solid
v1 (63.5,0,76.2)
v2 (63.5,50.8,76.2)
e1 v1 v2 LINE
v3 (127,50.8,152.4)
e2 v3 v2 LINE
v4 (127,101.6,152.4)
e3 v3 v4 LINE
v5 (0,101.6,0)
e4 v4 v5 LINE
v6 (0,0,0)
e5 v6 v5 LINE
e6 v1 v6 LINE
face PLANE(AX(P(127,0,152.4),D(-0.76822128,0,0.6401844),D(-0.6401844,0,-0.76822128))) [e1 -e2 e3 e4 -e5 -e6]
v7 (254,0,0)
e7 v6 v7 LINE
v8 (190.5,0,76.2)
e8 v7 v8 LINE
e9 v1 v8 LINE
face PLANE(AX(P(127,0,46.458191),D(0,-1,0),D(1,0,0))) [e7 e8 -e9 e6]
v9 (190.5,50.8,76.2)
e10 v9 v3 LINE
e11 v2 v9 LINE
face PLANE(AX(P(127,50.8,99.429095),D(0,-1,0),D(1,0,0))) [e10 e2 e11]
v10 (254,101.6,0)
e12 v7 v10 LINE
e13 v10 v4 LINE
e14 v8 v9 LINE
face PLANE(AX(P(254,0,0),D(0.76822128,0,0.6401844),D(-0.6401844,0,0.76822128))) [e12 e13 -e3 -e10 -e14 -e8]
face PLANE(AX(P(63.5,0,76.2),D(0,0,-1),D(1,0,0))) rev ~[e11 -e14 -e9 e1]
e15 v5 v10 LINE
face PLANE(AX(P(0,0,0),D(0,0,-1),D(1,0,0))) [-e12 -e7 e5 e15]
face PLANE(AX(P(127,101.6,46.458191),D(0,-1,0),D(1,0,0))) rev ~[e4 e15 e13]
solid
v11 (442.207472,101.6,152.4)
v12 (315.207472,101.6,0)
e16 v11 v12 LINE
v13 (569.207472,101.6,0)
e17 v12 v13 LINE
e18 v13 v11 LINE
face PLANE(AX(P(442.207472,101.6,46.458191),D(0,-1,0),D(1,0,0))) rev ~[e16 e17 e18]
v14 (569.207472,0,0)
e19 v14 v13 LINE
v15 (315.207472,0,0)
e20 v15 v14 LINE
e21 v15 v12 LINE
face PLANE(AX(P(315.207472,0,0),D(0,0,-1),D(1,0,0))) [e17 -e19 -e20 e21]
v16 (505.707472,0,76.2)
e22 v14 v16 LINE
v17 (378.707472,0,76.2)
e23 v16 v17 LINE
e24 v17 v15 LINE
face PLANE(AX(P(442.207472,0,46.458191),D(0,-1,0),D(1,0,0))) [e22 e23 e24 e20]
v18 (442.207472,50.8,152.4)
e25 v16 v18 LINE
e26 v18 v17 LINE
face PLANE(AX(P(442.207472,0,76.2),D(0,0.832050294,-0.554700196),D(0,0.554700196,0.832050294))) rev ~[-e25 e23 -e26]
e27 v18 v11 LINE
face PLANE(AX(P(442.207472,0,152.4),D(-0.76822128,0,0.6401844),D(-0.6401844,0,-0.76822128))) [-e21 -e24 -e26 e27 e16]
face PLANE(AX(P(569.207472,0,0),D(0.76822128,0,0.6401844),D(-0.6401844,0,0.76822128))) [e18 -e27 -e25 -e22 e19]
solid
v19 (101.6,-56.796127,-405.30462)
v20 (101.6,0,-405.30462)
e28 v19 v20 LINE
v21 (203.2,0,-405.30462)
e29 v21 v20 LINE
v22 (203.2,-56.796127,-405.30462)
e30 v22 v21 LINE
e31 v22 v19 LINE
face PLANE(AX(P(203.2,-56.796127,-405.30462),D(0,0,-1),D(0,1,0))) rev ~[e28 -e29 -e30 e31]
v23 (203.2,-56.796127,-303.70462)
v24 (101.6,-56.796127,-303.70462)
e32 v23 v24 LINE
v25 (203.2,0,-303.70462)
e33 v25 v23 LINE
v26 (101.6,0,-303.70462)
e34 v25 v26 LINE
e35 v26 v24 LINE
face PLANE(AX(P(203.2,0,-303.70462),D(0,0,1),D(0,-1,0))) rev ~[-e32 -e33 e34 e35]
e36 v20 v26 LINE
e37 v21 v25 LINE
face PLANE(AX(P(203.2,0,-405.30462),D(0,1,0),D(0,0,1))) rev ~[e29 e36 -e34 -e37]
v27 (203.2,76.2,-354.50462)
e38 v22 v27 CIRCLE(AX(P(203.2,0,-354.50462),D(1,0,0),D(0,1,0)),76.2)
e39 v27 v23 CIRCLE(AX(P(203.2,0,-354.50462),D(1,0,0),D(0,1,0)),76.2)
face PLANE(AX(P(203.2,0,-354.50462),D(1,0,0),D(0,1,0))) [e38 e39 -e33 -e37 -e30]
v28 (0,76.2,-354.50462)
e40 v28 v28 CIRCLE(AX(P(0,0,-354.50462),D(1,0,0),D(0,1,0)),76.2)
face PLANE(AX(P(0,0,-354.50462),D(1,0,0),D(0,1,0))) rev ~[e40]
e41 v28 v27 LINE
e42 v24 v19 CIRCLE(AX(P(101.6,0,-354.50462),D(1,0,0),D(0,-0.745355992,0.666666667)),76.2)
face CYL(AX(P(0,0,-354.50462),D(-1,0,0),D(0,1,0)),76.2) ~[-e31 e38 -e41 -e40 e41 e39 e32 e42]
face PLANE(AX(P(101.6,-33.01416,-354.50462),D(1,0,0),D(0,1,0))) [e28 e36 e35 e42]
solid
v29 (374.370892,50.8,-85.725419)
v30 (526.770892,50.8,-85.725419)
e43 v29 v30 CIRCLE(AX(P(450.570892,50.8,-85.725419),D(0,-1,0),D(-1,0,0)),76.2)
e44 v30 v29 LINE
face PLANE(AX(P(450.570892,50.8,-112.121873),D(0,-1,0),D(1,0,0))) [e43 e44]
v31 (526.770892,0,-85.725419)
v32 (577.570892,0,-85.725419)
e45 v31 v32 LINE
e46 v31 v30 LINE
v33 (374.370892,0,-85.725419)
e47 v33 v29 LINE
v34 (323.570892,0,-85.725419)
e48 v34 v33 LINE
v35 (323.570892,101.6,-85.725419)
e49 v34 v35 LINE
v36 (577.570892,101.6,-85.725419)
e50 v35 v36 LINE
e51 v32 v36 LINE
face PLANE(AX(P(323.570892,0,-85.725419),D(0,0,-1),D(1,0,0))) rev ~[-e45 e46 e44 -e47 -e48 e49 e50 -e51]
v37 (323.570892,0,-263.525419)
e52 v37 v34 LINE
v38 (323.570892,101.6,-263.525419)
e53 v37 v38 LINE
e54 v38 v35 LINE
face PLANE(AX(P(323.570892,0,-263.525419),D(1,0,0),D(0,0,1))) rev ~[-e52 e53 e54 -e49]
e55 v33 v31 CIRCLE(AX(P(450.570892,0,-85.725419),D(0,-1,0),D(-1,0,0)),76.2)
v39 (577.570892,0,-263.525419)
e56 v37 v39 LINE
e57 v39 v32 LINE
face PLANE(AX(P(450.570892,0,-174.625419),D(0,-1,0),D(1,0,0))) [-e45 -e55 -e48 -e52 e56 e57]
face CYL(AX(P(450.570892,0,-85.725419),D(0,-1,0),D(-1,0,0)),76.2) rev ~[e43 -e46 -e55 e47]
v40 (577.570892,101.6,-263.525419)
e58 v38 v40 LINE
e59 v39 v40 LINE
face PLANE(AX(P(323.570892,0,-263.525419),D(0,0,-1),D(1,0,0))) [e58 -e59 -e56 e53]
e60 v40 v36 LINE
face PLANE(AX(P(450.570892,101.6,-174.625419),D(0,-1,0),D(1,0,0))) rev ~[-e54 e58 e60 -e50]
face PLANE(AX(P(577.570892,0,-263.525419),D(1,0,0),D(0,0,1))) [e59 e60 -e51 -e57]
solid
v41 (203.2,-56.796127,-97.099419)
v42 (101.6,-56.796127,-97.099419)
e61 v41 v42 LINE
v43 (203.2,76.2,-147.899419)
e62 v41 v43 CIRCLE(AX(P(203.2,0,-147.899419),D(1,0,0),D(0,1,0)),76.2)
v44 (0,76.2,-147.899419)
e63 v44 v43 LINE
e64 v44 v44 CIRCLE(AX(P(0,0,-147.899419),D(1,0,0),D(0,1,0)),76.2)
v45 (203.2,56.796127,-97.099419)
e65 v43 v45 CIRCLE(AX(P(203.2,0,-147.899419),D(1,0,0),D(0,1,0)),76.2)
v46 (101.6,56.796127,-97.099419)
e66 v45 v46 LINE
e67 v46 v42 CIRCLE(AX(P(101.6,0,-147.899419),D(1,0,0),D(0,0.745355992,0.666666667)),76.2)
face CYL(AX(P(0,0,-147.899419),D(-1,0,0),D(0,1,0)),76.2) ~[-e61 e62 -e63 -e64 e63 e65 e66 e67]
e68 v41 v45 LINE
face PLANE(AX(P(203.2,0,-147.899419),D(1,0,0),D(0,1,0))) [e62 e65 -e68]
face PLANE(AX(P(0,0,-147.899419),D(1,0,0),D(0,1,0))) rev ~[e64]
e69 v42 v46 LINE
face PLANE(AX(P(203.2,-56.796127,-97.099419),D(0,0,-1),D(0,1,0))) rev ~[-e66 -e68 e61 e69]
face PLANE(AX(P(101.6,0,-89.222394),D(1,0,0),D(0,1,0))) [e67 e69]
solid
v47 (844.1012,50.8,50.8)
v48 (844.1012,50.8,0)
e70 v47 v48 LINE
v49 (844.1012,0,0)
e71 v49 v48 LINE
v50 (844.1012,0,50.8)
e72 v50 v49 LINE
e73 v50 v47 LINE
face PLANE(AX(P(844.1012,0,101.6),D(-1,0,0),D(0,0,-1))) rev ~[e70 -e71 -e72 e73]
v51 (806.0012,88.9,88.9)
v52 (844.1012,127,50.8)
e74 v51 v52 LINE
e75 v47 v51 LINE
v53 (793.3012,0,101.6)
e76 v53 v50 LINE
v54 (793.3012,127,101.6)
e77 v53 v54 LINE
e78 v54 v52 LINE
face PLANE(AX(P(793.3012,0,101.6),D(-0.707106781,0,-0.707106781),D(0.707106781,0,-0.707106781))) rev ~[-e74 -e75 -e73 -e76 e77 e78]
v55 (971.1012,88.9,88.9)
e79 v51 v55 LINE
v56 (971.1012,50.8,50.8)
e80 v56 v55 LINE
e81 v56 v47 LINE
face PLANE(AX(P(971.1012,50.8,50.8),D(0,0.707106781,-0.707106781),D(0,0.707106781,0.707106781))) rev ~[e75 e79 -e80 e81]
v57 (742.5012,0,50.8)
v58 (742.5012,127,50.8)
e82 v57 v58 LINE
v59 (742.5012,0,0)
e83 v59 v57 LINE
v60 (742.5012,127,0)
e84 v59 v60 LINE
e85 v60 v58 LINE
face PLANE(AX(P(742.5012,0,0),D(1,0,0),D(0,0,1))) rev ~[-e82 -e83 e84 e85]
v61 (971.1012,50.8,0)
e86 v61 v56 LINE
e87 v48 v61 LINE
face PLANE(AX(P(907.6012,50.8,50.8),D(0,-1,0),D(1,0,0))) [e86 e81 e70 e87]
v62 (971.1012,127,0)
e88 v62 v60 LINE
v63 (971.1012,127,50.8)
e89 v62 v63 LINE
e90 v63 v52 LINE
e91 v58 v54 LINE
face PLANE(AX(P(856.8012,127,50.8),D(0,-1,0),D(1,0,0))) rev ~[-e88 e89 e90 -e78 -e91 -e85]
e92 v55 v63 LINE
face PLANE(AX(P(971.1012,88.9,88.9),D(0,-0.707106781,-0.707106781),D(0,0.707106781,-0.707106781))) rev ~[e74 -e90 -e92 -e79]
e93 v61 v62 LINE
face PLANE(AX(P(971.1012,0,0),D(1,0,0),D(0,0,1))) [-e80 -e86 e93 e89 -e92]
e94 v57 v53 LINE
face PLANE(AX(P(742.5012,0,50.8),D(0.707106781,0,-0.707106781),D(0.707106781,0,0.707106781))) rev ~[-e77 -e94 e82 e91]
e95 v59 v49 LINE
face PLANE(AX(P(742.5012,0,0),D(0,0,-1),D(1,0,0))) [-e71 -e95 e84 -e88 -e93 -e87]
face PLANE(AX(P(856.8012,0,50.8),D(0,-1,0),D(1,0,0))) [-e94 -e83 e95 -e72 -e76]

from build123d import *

# Parameters (mm, degrees)
F1_DEPTH  = 101.6
F3_DEPTH  = 50.8
F5_DEPTH  = 101.6
F9_DEPTH  = 70.612
F10_W     = 228.6
F10_H     = 101.6
F11_DEPTH = 127
F13_DEPTH = 139.7
F17_DEPTH = 50.8
F18_DEPTH = 127
F19_DEPTH = 177.8
F20_R     = 76.2
F21_DEPTH = 203.2
F23_DEPTH = 101.6
F24_R     = 76.2
F25_DEPTH = 203.2
F27_DEPTH = 101.6
F28_W     = 254
F28_H     = 177.8
F29_DEPTH = 101.6
F31_DEPTH = 50.8


with BuildPart() as f1:
    # F0 (on Front) → F1 (new body)
    with BuildSketch(Plane.XZ):
        Polygon((127, 152.4), (0, 0), (254, 0), align=None)
    extrude(amount=-F1_DEPTH)

    # F2 (on face) → F3 (cut)
    with BuildSketch(Plane.XZ):
        Polygon((63.5, 76.2), (127, 76.2), (190.5, 76.2), (127, 152.4), align=None)
    extrude(amount=-F3_DEPTH, mode=Mode.SUBTRACT)


with BuildPart() as f5:
    # F4 (on Front) → F5 (new body)
    with BuildSketch(Plane.XZ):
        Polygon((442.2074718067, 152.4), (315.2074718067, 0), (569.2074718067, 0), align=None)
    extrude(amount=-F5_DEPTH)

    # F8 (on face) → F9 (cut, symmetric)
    with BuildSketch(Plane.YZ.offset(442.2074718067)):
        Polygon((50.8, 152.4), (0, 152.4), (0, 76.2), align=None)
    extrude(amount=F9_DEPTH, both=True, mode=Mode.SUBTRACT)


with BuildPart() as f11:
    # F10 (on Front) → F11 (new body)
    with BuildSketch(Plane.XZ):
        with Locations((856.8012001758, 50.8)):
            Rectangle(F10_W, F10_H)
    extrude(amount=-F11_DEPTH)

    # F12 (on face) → F13 (cut)
    with BuildSketch(Plane.XZ):
        Polygon((844.1012001758, 101.6), (793.3012001758, 101.6), (844.1012001758, 50.8), align=None)
        Polygon((793.3012001758, 101.6), (742.5012001758, 101.6), (742.5012001758, 50.8), align=None)
    extrude(amount=-F13_DEPTH, mode=Mode.SUBTRACT)

    # F14 (on face) → F17 (cut)
    with BuildSketch(Plane.XZ):
        Polygon((844.1012001758, 101.6), (844.1012001758, 50.8), (844.1012001758, 0), (971.1012001758, 0), (971.1012001758, 50.8), (971.1012001758, 101.6), align=None)
    extrude(amount=-F17_DEPTH, mode=Mode.SUBTRACT)

    # F15 (on face) → F18 (cut)
    with BuildSketch(Plane.YZ.offset(971.1012001758)):
        Polygon((50.8, 0), (50.8, 50.8), (88.9, 88.9), (127, 50.8), (127, 101.6), (0, 101.6), (0, 0), align=None)
    extrude(amount=-F18_DEPTH, mode=Mode.SUBTRACT)

    # F16 (on face) → F19 (join)
    with BuildSketch(Plane.YZ.offset(971.1012001758)):
        Polygon((88.9, 88.9), (50.8, 50.8), (50.8, 0), (127, 0), (127, 50.8), align=None)
    extrude(amount=-F19_DEPTH)


with BuildPart() as f21:
    # F20 (on Right) → F21 (new body)
    with BuildSketch(Plane.YZ):
        with Locations((0, -147.8994190693)):
            Circle(F20_R)
    extrude(amount=F21_DEPTH)

    # F22 (on face) → F23 (cut)
    with BuildSketch(Plane.YZ.offset(203.2)):
        with BuildLine():
            Line((-56.7961266285, -97.0994190693), (0, -97.0994190693))
            Line((0, -97.0994190693), (56.7961266285, -97.0994190693))
            ThreePointArc((56.7961266285, -97.0994190693), (0, -71.6994190693), (-56.7961266285, -97.0994190693))
        make_face()
    extrude(amount=-F23_DEPTH, mode=Mode.SUBTRACT)


with BuildPart() as f25:
    # F24 (on Right) → F25 (new body)
    with BuildSketch(Plane.YZ):
        with Locations((0, -354.5046203547)):
            Circle(F24_R)
    extrude(amount=F25_DEPTH)

    # F26 (on face) → F27 (cut)
    with BuildSketch(Plane.YZ.offset(203.2)):
        with BuildLine():
            Line((0, -405.3046203547), (0, -354.5046203547))
            Line((0, -354.5046203547), (0, -303.7046203547))
            Line((0, -303.7046203547), (-56.7961266285, -303.7046203547))
            ThreePointArc((-56.7961266285, -303.7046203547), (-76.2, -354.5046203547), (-56.7961266285, -405.3046203547))
            Line((-56.7961266285, -405.3046203547), (0, -405.3046203547))
        make_face()
    extrude(amount=-F27_DEPTH, mode=Mode.SUBTRACT)


with BuildPart() as f29:
    # F28 (on Front) → F29 (new body)
    with BuildSketch(Plane.XZ):
        with Locations((450.5708919574, -174.6254190803)):
            Rectangle(F28_W, F28_H)
    extrude(amount=-F29_DEPTH)

    # F30 (on face) → F31 (cut)
    with BuildSketch(Plane.XZ):
        with BuildLine():
            ThreePointArc((374.3708919574, -85.7254190803), (450.5708919574, -161.9254190803), (526.7708919574, -85.7254190803))
            Line((526.7708919574, -85.7254190803), (374.3708919574, -85.7254190803))
        make_face()
    extrude(amount=-F31_DEPTH, mode=Mode.SUBTRACT)


solid = Compound([f1.part, f5.part, f11.part, f21.part, f25.part, f29.part])
